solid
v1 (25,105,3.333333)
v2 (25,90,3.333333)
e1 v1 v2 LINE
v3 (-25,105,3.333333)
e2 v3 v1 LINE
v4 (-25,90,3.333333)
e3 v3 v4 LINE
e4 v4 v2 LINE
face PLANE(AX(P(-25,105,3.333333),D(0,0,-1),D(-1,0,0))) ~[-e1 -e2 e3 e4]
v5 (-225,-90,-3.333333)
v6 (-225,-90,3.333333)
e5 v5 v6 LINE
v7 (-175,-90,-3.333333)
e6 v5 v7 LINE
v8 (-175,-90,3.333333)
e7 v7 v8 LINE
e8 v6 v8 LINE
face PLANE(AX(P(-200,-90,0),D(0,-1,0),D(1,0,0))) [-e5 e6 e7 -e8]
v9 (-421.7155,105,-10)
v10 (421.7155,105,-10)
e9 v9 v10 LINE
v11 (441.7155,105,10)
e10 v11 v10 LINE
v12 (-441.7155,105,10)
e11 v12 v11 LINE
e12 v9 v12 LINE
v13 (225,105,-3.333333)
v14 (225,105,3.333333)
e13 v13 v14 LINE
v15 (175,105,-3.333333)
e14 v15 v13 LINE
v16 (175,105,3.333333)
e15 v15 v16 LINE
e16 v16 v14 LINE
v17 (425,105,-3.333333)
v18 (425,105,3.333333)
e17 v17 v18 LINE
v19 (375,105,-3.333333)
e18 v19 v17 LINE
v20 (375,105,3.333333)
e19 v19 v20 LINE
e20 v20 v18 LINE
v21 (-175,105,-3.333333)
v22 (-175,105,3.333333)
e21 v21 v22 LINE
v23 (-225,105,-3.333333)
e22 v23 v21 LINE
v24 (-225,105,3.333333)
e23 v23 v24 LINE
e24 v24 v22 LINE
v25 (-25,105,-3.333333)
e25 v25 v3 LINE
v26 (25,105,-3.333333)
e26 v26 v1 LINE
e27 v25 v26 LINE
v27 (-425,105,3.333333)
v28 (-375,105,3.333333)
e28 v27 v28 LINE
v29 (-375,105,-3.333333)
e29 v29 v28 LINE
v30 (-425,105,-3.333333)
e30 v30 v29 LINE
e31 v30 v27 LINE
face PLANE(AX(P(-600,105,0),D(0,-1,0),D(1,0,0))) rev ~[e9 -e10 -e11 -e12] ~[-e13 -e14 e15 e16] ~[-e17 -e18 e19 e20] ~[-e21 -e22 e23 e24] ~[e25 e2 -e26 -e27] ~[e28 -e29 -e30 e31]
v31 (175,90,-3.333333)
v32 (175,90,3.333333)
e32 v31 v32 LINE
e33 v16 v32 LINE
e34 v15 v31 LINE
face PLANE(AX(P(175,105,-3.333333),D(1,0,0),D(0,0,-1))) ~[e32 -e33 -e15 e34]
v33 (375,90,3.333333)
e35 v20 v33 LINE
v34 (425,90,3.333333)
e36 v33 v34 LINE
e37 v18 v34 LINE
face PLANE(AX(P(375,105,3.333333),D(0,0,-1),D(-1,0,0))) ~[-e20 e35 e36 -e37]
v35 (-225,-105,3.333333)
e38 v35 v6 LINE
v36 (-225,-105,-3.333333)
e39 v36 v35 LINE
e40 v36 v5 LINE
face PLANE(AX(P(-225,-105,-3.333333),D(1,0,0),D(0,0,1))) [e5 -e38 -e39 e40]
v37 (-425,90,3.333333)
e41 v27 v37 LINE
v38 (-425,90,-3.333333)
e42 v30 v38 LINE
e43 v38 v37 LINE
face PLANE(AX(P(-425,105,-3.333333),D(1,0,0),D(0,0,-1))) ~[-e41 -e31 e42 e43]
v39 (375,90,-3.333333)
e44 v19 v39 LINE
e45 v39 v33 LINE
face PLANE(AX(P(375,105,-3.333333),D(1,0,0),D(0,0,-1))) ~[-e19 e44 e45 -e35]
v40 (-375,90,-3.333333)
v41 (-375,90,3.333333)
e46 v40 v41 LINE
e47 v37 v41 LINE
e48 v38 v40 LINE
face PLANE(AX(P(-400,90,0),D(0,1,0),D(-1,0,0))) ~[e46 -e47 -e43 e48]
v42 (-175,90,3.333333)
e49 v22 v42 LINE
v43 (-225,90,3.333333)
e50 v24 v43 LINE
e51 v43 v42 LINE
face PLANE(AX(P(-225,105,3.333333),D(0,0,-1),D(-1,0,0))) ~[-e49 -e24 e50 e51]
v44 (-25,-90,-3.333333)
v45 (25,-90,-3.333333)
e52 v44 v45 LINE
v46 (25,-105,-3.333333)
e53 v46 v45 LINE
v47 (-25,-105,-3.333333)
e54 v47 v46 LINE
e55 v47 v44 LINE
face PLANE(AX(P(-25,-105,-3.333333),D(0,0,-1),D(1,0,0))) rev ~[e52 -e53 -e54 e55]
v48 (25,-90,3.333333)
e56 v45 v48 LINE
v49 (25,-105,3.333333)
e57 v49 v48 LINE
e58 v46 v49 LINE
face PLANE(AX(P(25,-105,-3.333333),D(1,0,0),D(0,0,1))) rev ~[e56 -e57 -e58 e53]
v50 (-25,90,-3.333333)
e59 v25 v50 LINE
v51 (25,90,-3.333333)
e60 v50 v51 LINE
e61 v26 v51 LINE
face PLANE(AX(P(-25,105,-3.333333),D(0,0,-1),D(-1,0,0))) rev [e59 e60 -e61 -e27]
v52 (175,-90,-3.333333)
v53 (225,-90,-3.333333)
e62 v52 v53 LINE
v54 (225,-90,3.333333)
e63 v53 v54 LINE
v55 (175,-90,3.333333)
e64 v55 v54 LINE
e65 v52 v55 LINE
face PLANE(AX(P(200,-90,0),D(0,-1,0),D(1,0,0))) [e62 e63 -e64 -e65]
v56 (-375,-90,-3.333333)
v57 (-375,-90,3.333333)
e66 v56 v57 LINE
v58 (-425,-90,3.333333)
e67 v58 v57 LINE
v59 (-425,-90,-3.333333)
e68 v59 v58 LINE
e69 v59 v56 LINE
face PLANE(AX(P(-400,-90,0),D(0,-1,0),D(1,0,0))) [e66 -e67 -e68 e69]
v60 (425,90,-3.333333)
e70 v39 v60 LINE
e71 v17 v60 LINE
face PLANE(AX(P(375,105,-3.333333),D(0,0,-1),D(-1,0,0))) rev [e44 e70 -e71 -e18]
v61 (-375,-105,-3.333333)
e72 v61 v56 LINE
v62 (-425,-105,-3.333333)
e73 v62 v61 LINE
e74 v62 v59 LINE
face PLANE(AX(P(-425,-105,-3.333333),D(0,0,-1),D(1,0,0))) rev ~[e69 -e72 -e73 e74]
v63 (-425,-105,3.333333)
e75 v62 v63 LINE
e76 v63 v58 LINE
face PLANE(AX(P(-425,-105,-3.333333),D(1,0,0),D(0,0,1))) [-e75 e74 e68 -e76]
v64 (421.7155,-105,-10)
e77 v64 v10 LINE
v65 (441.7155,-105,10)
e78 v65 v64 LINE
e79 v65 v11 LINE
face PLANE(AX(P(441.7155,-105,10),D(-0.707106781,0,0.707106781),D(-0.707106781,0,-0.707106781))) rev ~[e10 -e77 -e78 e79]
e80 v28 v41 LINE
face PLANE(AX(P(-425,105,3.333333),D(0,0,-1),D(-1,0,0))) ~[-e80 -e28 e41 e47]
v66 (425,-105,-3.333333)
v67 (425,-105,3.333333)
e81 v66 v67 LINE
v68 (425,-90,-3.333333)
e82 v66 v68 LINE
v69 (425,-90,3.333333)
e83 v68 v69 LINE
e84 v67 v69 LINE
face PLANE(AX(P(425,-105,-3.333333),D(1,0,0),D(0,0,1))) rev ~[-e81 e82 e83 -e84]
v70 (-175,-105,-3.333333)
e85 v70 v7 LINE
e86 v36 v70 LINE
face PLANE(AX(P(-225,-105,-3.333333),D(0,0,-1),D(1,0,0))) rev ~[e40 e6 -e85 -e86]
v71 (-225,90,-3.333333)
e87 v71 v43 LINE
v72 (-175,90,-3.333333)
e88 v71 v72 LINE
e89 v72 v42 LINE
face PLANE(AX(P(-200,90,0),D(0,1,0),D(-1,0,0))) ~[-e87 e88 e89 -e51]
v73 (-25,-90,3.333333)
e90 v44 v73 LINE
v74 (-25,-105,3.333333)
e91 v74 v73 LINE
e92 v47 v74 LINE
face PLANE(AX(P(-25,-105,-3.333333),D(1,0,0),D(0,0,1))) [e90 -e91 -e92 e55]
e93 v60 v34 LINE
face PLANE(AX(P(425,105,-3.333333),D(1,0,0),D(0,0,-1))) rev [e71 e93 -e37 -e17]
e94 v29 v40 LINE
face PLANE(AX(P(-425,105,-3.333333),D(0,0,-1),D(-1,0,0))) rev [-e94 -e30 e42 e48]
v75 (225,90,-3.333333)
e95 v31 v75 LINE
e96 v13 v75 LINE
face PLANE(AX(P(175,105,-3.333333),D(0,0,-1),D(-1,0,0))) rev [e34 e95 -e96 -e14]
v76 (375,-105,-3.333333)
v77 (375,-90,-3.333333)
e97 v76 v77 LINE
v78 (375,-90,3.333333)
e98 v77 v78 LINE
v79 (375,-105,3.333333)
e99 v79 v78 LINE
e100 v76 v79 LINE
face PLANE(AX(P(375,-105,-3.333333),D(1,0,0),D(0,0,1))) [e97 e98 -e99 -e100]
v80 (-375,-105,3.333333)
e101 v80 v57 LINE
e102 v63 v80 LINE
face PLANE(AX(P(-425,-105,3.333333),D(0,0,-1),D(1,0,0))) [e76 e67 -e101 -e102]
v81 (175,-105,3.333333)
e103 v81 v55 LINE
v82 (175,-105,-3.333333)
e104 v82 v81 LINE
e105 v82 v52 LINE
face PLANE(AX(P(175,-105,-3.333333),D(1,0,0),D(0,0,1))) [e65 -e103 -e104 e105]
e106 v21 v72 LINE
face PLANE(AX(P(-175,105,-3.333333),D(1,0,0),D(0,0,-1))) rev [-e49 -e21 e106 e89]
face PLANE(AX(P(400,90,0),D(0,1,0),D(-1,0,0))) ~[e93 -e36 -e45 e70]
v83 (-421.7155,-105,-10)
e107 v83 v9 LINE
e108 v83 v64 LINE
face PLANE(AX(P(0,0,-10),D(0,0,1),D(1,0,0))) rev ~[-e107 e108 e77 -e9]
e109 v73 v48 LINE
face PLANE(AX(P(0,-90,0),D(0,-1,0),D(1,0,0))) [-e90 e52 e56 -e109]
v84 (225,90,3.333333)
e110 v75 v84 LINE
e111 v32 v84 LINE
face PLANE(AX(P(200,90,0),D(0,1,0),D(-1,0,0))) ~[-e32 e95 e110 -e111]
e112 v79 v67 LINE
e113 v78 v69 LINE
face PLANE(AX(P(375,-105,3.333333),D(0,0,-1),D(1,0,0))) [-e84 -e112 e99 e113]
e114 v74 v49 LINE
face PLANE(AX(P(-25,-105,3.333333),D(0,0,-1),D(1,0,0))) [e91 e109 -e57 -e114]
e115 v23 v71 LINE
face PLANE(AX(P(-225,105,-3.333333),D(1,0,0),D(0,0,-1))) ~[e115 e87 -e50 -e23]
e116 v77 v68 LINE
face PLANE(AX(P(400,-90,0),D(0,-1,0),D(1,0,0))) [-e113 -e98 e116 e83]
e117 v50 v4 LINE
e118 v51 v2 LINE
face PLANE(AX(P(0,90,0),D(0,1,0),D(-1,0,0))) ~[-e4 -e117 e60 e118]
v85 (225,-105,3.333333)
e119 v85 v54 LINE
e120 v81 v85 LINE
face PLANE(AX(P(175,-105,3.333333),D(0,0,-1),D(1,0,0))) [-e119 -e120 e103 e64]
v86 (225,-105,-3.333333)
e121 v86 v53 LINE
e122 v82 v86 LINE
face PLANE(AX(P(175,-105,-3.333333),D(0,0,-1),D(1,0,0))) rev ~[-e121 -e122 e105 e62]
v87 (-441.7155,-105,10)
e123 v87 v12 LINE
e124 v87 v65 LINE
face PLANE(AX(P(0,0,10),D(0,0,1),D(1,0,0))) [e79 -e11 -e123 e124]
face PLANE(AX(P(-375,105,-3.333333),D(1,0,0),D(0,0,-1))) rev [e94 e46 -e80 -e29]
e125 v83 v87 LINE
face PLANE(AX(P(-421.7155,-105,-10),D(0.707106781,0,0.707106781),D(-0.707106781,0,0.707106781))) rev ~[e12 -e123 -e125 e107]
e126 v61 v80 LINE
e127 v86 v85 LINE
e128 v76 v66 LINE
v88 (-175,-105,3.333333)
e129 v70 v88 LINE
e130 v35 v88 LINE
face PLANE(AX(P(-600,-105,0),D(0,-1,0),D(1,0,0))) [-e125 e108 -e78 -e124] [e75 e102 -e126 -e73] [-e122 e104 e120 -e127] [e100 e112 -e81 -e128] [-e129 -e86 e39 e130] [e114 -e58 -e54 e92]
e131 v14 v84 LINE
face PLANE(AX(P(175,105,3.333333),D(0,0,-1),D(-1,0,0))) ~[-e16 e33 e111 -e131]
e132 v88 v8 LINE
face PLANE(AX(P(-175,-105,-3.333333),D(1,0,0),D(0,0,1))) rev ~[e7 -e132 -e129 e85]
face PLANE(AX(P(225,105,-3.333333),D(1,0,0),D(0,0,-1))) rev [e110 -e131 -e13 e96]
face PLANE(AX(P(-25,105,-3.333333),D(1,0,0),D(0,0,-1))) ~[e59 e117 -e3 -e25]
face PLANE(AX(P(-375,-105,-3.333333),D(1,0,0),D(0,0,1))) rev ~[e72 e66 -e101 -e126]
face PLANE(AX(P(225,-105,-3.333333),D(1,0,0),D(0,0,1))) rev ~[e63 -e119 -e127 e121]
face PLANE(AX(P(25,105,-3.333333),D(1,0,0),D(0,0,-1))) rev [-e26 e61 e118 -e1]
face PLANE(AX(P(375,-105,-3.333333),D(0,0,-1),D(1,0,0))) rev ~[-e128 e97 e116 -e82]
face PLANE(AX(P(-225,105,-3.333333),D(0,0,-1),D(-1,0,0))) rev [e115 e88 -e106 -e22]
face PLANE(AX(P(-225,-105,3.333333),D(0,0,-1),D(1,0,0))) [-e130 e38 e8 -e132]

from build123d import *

# Parameters (mm, degrees)
F1_W     = 1200
F1_H     = 210
F2_DEPTH = 10
F3_W     = 50
F3_H     = 6.6666666667
F4_DEPTH = 15
F6_DEPTH = 210.001


# Not quite as in the source:
# - a pattern or mirror of a feature is missing from the dataset's text; its kind, count and spacing are read off the source's solid


with BuildPart() as f2:
    # F1 (on Top) → F2 (new body, symmetric)
    with BuildSketch(Plane.XY):
        Rectangle(F1_W, F1_H)
    extrude(amount=F2_DEPTH, both=True)

    # F3 (on face) → F4 (cut)
    with BuildSketch(Plane.XZ.offset(105)):
        Rectangle(F3_W, F3_H)
        with Locations((200, 0)):
            Rectangle(F3_W, F3_H)
        with Locations((400, 0)):
            Rectangle(F3_W, F3_H)
        with Locations((-200, 0)):
            Rectangle(F3_W, F3_H)
        with Locations((-400, 0)):
            Rectangle(F3_W, F3_H)
    f4 = extrude(amount=-F4_DEPTH, mode=Mode.SUBTRACT)

    # F4_copies: F4 across plane
    add(f4.mirror(Plane.ZX), mode=Mode.SUBTRACT)

    # F5 (on face) → F6 (cut, through all)
    with BuildSketch(Plane.XZ.offset(105)):
        Polygon((-421.7155, -10), (-441.7155, 10), (-600, 10), (-600, -10), align=None)
        Polygon((600, -10), (600, 10), (441.7155, 10), (421.7155, -10), align=None)
    extrude(amount=-F6_DEPTH, mode=Mode.SUBTRACT)


solid = f2.part
